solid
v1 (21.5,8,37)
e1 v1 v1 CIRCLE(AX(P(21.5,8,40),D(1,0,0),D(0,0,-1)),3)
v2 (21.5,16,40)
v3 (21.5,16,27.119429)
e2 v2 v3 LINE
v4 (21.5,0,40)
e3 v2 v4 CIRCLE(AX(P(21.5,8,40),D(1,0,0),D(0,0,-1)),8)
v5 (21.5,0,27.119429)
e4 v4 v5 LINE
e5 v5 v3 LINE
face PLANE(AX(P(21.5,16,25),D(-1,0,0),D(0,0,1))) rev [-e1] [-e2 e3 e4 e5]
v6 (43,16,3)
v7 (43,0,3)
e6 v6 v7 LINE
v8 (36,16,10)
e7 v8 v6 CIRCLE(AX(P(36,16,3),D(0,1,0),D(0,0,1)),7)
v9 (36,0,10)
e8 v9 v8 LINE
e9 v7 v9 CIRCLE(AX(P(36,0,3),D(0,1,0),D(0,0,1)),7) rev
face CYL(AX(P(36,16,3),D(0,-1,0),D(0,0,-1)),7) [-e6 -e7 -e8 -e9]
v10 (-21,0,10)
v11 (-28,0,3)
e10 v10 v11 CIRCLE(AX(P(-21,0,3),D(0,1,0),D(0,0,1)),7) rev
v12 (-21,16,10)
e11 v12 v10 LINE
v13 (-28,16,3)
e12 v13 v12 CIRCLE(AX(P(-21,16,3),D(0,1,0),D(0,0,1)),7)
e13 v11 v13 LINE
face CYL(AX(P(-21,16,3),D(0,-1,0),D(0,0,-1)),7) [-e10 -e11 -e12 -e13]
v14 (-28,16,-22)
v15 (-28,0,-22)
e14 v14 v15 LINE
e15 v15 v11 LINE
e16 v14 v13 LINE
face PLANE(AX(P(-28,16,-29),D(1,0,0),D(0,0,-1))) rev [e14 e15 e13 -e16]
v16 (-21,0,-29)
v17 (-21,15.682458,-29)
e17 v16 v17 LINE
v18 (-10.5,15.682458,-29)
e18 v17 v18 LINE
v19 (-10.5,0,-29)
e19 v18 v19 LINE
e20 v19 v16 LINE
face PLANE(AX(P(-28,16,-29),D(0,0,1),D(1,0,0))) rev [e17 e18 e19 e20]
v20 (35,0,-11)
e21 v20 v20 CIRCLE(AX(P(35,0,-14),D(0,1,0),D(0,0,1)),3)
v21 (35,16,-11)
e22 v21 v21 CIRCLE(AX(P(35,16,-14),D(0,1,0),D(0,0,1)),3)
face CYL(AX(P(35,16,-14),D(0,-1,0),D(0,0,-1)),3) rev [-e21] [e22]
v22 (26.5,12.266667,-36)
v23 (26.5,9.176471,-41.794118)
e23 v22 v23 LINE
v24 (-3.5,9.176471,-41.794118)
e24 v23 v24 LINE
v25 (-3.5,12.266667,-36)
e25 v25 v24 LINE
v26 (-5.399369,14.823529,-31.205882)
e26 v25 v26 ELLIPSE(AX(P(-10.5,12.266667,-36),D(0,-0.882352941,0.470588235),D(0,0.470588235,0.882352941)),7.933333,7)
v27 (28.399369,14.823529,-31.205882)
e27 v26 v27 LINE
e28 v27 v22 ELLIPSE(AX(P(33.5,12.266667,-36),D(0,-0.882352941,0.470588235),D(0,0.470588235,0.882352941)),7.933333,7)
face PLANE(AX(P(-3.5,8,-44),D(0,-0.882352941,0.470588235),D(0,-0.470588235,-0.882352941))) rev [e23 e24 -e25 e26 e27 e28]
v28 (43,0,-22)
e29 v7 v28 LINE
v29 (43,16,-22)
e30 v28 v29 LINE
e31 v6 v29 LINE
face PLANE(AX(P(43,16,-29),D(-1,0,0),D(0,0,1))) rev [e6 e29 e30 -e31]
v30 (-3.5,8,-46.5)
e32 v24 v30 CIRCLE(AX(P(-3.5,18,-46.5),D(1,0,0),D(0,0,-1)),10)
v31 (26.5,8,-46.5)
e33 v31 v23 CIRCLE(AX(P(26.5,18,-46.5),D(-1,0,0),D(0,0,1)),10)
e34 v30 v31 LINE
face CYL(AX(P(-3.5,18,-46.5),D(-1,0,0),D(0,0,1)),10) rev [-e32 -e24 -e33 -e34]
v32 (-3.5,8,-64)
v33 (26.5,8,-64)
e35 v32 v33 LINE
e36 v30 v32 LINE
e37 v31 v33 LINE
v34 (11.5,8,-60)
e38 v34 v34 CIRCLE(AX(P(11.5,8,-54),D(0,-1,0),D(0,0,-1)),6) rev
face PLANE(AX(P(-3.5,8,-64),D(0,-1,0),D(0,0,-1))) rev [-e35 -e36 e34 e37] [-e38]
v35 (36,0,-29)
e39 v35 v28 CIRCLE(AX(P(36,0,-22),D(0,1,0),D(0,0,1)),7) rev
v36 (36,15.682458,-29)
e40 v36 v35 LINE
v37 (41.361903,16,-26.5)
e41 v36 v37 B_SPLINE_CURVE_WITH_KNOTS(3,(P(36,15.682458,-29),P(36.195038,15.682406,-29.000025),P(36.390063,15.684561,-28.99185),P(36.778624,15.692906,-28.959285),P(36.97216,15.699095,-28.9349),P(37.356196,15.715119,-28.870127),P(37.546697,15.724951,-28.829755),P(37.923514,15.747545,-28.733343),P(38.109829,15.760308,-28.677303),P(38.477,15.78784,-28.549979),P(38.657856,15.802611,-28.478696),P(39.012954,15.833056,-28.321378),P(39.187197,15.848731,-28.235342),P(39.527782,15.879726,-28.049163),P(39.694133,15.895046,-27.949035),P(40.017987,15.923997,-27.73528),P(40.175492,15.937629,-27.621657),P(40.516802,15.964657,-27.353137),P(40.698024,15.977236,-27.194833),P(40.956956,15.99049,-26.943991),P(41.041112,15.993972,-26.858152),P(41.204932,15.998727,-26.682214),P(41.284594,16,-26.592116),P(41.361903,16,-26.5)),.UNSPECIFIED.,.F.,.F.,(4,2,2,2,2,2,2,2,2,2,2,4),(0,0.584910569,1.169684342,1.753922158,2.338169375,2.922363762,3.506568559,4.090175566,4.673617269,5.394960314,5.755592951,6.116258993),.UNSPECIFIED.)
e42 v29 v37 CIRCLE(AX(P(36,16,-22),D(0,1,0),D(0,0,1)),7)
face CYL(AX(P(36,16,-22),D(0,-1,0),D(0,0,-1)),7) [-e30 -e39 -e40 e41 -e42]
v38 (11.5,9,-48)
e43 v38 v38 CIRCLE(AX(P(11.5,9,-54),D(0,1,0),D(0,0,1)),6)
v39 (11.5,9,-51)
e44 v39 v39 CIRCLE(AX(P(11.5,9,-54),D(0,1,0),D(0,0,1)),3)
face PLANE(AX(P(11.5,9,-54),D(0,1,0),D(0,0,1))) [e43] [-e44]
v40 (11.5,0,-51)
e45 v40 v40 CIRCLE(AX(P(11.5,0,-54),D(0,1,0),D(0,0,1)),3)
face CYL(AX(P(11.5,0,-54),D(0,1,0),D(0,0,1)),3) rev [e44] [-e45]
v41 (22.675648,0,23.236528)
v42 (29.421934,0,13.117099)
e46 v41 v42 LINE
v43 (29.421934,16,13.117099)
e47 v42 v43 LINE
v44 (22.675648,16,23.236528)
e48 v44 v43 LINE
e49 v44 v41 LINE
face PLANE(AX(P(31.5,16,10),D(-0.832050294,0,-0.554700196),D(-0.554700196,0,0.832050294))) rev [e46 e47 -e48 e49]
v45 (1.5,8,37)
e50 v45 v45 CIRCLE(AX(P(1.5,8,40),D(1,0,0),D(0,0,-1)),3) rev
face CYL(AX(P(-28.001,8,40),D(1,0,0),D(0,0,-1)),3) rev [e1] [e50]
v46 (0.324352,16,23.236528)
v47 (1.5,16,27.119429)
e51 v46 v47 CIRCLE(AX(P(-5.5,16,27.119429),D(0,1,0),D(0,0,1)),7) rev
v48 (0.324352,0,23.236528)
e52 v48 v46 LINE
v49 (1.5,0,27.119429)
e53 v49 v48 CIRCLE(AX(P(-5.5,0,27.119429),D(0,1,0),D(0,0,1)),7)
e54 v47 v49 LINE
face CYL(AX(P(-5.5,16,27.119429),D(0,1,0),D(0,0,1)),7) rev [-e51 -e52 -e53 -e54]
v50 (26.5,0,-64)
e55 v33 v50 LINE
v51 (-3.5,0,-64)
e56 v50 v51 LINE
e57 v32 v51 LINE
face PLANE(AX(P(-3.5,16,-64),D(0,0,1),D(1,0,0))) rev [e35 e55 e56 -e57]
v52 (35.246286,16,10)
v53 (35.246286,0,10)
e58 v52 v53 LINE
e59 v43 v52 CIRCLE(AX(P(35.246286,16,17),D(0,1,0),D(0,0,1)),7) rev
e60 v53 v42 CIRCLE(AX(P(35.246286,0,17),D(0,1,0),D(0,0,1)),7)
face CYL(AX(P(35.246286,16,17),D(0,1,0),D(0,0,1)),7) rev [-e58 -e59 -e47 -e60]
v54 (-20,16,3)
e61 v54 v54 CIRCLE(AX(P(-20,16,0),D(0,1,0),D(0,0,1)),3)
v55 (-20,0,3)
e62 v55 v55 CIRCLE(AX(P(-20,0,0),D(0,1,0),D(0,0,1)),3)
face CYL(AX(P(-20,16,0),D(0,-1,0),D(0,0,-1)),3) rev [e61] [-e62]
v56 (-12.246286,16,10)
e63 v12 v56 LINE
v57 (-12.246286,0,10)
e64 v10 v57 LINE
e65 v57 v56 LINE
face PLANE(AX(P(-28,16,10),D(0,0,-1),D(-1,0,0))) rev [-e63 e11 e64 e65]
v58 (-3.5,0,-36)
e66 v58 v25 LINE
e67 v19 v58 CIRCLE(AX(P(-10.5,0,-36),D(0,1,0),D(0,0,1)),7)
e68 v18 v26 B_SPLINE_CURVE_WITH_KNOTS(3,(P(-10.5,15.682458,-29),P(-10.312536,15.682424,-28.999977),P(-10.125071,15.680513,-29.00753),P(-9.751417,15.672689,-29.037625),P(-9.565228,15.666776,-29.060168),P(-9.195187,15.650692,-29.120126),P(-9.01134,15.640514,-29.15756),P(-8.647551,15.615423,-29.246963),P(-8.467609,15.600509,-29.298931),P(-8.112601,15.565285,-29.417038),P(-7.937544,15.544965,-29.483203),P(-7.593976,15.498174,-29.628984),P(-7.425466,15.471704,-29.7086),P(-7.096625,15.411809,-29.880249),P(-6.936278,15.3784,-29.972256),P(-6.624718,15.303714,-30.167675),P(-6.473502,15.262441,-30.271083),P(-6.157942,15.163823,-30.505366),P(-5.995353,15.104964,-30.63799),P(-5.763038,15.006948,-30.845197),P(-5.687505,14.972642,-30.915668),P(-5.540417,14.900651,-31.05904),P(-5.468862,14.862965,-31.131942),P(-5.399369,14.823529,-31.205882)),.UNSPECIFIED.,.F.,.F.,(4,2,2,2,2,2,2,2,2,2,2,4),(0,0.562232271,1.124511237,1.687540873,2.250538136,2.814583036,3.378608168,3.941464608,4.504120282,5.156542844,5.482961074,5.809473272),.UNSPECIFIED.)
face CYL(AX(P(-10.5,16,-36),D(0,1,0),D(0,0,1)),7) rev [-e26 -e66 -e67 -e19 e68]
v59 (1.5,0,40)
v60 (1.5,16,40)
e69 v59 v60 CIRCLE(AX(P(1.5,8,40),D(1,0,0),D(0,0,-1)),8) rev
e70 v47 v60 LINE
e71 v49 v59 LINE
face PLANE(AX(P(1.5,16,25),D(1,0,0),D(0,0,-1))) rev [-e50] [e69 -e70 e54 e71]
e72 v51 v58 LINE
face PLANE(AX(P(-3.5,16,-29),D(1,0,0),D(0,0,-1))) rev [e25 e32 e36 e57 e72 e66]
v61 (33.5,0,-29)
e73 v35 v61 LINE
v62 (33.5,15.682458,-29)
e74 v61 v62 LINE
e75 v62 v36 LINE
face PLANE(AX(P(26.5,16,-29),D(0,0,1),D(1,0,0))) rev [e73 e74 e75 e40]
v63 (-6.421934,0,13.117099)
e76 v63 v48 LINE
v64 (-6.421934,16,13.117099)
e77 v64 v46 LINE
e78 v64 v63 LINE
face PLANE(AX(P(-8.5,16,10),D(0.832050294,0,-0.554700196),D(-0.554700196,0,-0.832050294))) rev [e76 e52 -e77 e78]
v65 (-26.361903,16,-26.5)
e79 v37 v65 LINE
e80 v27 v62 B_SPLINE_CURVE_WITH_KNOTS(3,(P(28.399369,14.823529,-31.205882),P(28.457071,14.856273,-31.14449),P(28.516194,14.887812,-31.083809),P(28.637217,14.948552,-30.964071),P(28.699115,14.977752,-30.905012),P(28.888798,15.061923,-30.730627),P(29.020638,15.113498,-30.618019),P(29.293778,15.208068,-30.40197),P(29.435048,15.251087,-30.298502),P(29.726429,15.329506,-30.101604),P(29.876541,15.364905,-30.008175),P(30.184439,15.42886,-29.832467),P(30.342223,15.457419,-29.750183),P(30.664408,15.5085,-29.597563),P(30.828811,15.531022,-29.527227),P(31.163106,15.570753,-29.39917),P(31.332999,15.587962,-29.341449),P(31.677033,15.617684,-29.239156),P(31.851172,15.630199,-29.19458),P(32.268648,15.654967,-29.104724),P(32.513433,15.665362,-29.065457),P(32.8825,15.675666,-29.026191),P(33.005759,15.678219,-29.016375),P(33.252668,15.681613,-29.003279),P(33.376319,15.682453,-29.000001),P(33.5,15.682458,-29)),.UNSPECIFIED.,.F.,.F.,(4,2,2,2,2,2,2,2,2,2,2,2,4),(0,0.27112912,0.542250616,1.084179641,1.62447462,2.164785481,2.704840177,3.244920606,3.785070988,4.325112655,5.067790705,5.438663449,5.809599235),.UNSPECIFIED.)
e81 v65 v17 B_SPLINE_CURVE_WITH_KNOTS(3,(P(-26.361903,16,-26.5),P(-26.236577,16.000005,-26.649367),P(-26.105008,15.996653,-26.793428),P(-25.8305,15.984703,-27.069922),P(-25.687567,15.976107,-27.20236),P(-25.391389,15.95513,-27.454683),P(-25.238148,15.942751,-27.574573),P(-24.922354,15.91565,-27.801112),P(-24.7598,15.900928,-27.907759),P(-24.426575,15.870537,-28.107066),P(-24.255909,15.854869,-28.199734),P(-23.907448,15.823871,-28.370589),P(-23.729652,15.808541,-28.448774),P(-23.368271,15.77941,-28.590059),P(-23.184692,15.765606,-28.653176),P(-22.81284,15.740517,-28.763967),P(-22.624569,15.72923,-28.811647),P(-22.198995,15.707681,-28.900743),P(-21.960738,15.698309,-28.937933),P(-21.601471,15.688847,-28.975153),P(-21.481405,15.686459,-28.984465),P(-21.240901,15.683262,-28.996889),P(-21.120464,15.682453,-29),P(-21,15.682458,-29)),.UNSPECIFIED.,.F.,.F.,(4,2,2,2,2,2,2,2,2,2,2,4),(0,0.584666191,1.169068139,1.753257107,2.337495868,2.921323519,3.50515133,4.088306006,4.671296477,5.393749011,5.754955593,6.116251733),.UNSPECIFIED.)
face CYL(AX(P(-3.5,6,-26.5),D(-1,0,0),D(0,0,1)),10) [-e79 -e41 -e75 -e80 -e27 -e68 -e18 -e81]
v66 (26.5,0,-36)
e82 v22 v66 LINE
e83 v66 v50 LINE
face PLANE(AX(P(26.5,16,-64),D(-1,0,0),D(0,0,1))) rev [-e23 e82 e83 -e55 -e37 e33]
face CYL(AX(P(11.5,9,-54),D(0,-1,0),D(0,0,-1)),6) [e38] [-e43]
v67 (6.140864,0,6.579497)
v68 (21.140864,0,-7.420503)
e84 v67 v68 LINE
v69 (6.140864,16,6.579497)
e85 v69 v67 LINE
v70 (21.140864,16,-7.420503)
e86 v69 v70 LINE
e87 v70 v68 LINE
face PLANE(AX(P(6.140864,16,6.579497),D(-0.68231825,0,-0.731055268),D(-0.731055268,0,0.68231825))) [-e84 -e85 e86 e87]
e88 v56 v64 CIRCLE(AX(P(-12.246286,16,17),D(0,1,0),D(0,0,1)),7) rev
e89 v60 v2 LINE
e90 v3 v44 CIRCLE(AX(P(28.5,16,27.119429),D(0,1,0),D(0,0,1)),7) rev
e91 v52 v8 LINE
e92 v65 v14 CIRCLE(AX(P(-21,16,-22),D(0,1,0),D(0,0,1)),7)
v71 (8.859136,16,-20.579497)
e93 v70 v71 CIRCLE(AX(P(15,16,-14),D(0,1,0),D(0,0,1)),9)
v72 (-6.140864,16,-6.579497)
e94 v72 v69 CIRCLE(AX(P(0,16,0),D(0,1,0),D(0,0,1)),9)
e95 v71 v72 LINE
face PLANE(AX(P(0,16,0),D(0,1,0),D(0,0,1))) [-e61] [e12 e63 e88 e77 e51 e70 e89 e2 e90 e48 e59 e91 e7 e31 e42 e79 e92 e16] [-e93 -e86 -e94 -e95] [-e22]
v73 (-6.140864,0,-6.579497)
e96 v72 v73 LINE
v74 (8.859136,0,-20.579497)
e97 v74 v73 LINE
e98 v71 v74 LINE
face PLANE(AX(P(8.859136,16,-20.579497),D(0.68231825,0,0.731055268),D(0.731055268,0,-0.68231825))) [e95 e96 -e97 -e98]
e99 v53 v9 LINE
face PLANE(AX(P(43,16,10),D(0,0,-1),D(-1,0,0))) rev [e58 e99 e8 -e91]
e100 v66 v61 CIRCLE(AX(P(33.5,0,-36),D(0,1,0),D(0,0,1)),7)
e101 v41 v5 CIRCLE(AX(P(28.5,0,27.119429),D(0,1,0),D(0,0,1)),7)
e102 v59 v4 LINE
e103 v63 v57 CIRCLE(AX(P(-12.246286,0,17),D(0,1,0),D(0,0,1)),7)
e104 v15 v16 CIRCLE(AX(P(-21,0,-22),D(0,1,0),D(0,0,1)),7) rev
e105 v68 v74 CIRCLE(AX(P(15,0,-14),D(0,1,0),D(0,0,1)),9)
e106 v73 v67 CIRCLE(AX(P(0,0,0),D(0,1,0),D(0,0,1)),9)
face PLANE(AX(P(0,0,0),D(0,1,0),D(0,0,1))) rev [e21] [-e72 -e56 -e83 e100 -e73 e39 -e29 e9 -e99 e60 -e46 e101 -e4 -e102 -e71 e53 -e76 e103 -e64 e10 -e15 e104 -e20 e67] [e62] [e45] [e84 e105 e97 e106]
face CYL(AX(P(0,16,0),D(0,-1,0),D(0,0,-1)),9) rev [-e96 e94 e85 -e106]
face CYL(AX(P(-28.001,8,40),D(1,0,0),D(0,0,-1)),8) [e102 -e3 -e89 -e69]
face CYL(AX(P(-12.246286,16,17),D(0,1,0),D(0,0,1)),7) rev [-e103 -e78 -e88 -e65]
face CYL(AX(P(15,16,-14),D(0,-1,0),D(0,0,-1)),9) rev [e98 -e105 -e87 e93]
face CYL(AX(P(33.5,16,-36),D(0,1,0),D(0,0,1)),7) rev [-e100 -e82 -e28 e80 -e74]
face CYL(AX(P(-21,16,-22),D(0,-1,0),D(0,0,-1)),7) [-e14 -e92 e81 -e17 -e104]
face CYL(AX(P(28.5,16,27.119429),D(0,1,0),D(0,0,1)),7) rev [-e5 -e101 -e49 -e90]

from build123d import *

# Parameters (mm, degrees)
SKETCH_1_R          = 3
EXTRUDE_1_DEPTH     = 16
CUT_EXTRUDE_1_REACH = 84.476
SKETCH_2_R          = 3
CUT_EXTRUDE_2_REACH = 84.476
CUT_EXTRUDE_3_DEPTH = 30
SKETCH_5_R          = 3
CUT_EXTRUDE_4_DEPTH = 78.517739905
EXTRUDE_START       = 1
SKETCH_6_R          = 6
SKETCH_6_R_2        = 3
EXTRUDE_2_DEPTH     = 1
FILLET_1_R          = 7
FILLET_START        = -27
FILLET_3_DEPTH      = 69
FILLET_START_2      = -3.5
FILLET_3_2_DEPTH    = 30


with BuildPart() as part:
    # 草图1 → 凸台-拉伸1 (new body)
    with BuildSketch(Plane(origin=(0, 0, 0), x_dir=(1, 0, 0), z_dir=(0, 1, 0))):
        Polygon((-3.5, 64), (26.5, 64), (26.5, 29), (43, 29), (43, -10), (31.5, -10), (21.5, -25), (21.5, -48), (1.5, -48), (1.5, -25), (-8.5, -10), (-28, -10), (-28, 29), (-3.5, 29), align=None)
        with Locations(Location((-20, 0, 0), (0, 0, 270))):
            Circle(SKETCH_1_R, mode=Mode.SUBTRACT)
        with Locations(Location((35, 14, 0), (0, 0, 270))):
            Circle(SKETCH_1_R, mode=Mode.SUBTRACT)
        with BuildLine():
            Line((6.140864253, -6.579497414), (21.140864253, 7.420502586))
            ThreePointArc((21.140864253, 7.420502586), (21.579497414, 20.140864253), (8.859135747, 20.579497414))
            Line((8.859135747, 20.579497414), (-6.140864253, 6.579497414))
            ThreePointArc((-6.140864253, 6.579497414), (-6.579497414, -6.140864253), (6.140864253, -6.579497414))
        make_face(mode=Mode.SUBTRACT)
    extrude(amount=EXTRUDE_1_DEPTH)

    # 草图2 → 切除-拉伸1 (cut, up to next)
    with BuildSketch(Plane(origin=(21.5, 0, 0), x_dir=(0, 0, -1), z_dir=(1, 0, 0)), mode=Mode.PRIVATE) as cut_extrude_1_sk1:
        with Locations((-40, 8)):
            Circle(SKETCH_2_R)
    cut_extrude_1_tool1 = extrude(cut_extrude_1_sk1.sketch, amount=-CUT_EXTRUDE_1_REACH, mode=Mode.PRIVATE) & part.part
    add(cut_extrude_1_tool1.solids().sort_by_distance((21.5, 8, 40))[0], mode=Mode.SUBTRACT)

    # 草图3 → 切除-拉伸2 (cut, up to next)
    with BuildSketch(Plane(origin=(21.5, 0, 0), x_dir=(0, 0, -1), z_dir=(1, 0, 0)), mode=Mode.PRIVATE) as cut_extrude_2_sk1:
        with BuildLine():
            ThreePointArc((-48, 8), (-45.656854249, 13.656854249), (-40, 16))
            Line((-40, 16), (-48, 16))
            Line((-48, 16), (-48, 8))
        make_face()
    cut_extrude_2_tool1 = extrude(cut_extrude_2_sk1.sketch, amount=-CUT_EXTRUDE_2_REACH, mode=Mode.PRIVATE) & part.part
    # 草图3 → 切除-拉伸2 (cut, up to next)
    with BuildSketch(Plane(origin=(21.5, 0, 0), x_dir=(0, 0, -1), z_dir=(1, 0, 0)), mode=Mode.PRIVATE) as cut_extrude_2_sk2:
        with BuildLine():
            Line((-48, 0), (-40, 0))
            ThreePointArc((-40, 0), (-45.656854249, 2.343145751), (-48, 8))
            Line((-48, 8), (-48, 0))
        make_face()
    cut_extrude_2_tool2 = extrude(cut_extrude_2_sk2.sketch, amount=-CUT_EXTRUDE_2_REACH, mode=Mode.PRIVATE) & part.part
    add(cut_extrude_2_tool1.solids().sort_by_distance((21.5, 14.213056, 46.213056))[0], mode=Mode.SUBTRACT)
    add(cut_extrude_2_tool2.solids().sort_by_distance((21.5, 1.786944, 46.213056))[0], mode=Mode.SUBTRACT)

    # 草图4 → 切除-拉伸3 (cut)
    with BuildSketch(Plane(origin=(26.5, 0, 0), x_dir=(0, 0, -1), z_dir=(1, 0, 0))):
        Polygon((29, 16), (64, 16), (64, 8), (44, 8), align=None)
    extrude(amount=-CUT_EXTRUDE_3_DEPTH, mode=Mode.SUBTRACT)

    # 草图5 → 切除-拉伸4 (cut, through all)
    with BuildSketch(Plane(origin=(0, 8, 0), x_dir=(1, 0, 0), z_dir=(0, 1, 0))):
        with Locations(Location((11.5, 54, 0), (0, 0, 270))):
            Circle(SKETCH_5_R)
    extrude(amount=-CUT_EXTRUDE_4_DEPTH, mode=Mode.SUBTRACT)

    # 草图6 → 凸台-拉伸2 (add)
    with BuildSketch(Plane(origin=(0, 8, 0), x_dir=(1, 0, 0), z_dir=(0, 1, 0)).offset(EXTRUDE_START)):
        with Locations(Location((11.5, 54, 0), (0, 0, 90))):
            Circle(SKETCH_6_R)
        with Locations(Location((11.5, 54, 0), (0, 0, 270))):
            Circle(SKETCH_6_R_2, mode=Mode.SUBTRACT)
    extrude(amount=-EXTRUDE_2_DEPTH)

    # 圆角1
    fillet_1_edges = [part.edges().sort_by_distance(p)[0] for p in [
        (1.5, 8, 25),
        (-8.5, 8, 10),
        (-28, 8, 10),
        (-28, 8, -29),
        (-3.5, 8, -29),
        (26.5, 8, -29),
        (43, 8, -29),
        (43, 8, 10),
        (31.5, 8, 10),
        (21.5, 8, 25),
    ]]
    fillet(fillet_1_edges, radius=FILLET_1_R)

    # 圆角3: read off the stored shape, not the designer's step
    # 圆角3 outline → 圆角3 (cut)
    with BuildSketch(Plane.YZ.offset(FILLET_START)):
        with BuildLine():
            Line((14.823529412, -31.205882353), (16, -29))
            Line((16, -29), (16, -26.5))
            ThreePointArc((16, -26.5), (15.701425001, -28.92535625), (14.823529412, -31.205882353))
        make_face()
    extrude(amount=FILLET_3_DEPTH, mode=Mode.SUBTRACT)

    # Fillet 3 2 outline → Fillet 3 2 (add)
    with BuildSketch(Plane.YZ.offset(FILLET_START_2)):
        with BuildLine():
            Line((8, -44), (8, -46.5))
            ThreePointArc((8, -46.5), (8.298574999, -44.07464375), (9.176470588, -41.794117647))
            Line((9.176470588, -41.794117647), (8, -44))
        make_face()
    extrude(amount=FILLET_3_2_DEPTH)


solid = part.part
